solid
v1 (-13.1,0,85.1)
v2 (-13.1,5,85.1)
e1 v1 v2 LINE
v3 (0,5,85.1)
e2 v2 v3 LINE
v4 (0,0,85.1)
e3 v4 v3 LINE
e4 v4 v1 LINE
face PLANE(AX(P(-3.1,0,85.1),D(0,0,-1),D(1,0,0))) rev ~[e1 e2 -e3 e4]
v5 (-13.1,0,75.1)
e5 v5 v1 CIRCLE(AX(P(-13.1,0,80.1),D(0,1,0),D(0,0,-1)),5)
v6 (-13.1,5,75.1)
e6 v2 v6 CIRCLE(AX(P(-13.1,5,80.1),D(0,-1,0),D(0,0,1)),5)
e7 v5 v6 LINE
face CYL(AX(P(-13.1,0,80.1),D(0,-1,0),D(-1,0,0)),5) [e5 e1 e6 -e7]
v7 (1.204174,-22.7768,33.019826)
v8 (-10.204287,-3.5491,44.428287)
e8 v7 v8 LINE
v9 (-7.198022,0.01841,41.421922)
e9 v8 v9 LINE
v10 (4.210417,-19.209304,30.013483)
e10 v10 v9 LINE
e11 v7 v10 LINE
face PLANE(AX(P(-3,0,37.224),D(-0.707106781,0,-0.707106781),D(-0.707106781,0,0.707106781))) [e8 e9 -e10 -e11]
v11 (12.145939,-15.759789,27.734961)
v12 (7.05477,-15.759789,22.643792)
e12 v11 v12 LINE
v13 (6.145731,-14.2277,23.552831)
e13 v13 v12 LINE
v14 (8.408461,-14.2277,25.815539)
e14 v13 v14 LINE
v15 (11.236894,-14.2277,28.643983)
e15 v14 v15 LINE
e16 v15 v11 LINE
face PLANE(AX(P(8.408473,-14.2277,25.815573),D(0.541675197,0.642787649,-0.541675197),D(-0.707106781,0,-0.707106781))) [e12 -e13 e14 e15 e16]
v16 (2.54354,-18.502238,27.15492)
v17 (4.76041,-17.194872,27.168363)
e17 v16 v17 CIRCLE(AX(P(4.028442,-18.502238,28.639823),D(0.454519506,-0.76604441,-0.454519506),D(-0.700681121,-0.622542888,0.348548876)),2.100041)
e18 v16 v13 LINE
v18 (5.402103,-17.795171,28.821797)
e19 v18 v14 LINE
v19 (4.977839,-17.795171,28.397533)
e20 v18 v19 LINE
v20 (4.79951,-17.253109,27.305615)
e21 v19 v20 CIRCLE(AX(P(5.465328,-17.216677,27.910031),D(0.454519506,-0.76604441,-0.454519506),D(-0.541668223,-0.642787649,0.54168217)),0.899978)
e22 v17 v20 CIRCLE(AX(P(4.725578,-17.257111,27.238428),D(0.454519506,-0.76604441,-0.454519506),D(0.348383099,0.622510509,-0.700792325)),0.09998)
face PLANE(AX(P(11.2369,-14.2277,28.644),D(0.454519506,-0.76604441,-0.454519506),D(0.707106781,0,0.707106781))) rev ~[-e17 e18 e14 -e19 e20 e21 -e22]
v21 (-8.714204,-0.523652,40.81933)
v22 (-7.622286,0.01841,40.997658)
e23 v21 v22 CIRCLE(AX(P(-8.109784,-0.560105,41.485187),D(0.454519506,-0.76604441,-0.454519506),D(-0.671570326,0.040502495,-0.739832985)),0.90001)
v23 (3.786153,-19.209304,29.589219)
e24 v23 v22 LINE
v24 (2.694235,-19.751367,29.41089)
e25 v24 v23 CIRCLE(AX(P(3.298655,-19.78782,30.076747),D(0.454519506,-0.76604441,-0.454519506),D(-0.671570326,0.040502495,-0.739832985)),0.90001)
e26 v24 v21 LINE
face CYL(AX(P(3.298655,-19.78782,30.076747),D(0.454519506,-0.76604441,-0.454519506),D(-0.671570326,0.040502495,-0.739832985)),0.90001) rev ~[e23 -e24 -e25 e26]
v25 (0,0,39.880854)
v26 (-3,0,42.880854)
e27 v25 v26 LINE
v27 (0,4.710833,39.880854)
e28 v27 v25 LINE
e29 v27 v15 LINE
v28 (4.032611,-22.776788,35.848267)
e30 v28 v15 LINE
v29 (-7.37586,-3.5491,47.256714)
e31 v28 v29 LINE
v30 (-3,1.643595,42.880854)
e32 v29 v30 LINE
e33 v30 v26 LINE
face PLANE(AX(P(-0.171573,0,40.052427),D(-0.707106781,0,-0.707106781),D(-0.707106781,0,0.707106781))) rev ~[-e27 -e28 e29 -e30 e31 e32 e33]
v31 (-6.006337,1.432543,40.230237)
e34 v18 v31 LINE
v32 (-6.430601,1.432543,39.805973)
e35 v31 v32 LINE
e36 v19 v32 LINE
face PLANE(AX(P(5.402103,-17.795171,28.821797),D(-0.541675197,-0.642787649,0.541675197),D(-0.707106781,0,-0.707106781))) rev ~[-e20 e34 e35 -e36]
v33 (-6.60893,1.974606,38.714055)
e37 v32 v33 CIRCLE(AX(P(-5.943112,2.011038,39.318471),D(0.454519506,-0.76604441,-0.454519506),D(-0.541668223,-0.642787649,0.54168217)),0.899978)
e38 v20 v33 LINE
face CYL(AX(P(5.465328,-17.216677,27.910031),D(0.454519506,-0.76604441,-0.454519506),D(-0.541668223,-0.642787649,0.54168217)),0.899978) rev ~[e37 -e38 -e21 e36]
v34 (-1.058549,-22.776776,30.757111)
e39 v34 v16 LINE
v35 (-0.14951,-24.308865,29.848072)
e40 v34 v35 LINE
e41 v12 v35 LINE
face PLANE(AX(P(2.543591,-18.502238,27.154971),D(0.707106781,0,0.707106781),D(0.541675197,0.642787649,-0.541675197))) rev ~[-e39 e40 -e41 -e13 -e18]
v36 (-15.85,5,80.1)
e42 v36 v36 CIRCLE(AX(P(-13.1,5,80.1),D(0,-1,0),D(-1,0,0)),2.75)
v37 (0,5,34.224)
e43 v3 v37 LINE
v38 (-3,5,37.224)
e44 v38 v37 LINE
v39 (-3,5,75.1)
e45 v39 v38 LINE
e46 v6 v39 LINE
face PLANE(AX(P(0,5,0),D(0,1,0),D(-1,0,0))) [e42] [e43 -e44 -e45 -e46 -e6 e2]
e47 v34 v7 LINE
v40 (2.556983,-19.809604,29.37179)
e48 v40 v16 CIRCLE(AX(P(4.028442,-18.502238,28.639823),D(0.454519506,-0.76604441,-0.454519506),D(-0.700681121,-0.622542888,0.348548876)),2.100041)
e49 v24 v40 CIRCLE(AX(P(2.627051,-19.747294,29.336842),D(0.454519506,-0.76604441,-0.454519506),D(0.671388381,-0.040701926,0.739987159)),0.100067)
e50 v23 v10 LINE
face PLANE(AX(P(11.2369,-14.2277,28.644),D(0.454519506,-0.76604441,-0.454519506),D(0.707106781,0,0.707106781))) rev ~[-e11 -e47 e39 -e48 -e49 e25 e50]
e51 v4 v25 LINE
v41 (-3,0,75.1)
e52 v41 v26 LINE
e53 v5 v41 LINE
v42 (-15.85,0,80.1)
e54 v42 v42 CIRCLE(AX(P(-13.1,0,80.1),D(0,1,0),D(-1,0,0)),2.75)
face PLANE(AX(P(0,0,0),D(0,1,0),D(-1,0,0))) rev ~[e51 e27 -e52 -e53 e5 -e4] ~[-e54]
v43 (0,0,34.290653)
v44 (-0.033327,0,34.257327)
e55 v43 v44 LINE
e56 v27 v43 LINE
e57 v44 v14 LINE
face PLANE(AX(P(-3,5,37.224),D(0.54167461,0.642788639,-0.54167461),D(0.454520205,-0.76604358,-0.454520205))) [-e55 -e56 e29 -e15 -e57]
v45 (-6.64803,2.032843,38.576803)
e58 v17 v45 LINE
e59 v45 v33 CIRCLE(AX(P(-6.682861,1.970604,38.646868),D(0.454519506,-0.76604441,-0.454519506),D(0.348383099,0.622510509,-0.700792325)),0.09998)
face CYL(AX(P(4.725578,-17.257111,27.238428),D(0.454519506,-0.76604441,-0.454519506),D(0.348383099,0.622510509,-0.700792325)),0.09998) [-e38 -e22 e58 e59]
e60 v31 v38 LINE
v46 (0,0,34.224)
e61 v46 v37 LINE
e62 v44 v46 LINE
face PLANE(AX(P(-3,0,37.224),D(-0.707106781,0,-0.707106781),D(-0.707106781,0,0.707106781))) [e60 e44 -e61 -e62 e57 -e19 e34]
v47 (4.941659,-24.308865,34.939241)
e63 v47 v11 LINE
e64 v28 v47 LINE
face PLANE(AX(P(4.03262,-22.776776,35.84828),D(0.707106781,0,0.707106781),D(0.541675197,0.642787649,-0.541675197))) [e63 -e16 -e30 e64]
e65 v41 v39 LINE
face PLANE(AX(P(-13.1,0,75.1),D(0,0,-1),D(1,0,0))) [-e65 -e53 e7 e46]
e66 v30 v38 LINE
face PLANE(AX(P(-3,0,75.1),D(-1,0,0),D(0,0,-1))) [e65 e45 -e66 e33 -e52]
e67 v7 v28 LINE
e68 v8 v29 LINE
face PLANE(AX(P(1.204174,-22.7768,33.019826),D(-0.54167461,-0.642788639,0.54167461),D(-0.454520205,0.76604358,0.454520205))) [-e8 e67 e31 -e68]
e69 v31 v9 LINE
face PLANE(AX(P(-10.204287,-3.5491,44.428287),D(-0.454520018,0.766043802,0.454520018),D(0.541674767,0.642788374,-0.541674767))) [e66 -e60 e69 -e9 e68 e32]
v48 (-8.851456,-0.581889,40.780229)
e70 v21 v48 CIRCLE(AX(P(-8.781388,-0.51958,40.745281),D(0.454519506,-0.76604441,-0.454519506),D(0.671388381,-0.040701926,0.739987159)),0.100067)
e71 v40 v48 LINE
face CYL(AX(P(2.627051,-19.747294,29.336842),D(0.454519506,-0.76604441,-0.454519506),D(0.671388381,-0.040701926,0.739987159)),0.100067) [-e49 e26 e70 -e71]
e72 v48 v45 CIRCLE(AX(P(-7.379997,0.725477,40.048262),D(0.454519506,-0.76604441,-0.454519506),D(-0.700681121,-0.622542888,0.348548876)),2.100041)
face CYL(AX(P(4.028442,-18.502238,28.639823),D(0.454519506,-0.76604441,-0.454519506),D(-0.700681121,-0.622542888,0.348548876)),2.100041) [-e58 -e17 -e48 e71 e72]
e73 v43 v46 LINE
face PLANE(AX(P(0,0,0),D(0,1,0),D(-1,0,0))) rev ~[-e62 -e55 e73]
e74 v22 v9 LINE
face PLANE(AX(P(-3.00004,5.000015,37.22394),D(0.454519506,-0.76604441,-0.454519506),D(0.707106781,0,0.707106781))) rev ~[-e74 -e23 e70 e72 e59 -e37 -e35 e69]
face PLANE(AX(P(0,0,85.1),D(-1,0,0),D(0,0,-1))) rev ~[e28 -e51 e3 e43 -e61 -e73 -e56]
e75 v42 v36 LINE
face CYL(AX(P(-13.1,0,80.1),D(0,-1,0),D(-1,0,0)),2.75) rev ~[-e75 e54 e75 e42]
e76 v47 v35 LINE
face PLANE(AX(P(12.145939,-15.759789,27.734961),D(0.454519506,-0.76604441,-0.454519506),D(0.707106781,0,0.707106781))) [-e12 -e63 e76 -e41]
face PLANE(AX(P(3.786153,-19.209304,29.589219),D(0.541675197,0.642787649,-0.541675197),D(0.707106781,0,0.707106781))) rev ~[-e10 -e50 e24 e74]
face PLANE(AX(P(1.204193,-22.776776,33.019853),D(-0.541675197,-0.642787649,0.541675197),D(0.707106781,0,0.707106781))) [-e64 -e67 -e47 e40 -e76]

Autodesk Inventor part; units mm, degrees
ref_plane "YZ Plane" through (0, 0, 0) normal (1, 0, 0) x (0, 1, 0)
ref_plane "XZ Plane" through (0, 0, 0) normal (0, 1, 0) x (-1, 0, 0)
ref_plane "XY Plane" through (0, 0, 0) normal (0, 0, 1) x (1, 0, 0)
sketch "Sketch2" plane through (0, 0, 0) normal (0, 1, 0) x (-1, 0, 0)
  circle A0 centre (13.1, 80.1) radius 2.75
  circle A1 centre (80.1, 13.1) radius 2.75 construction
  line L0 (13.1, 80.1) -> (13.1, 13.1)
  line L1 (13.1, 13.1) -> (80.1, 13.1)
  line L2 (3, 37.224) -> (37.224, 3)
  line L3 (3, 37.224) -> (51.4, 37.224) construction
  circle A2 centre (80.1, 13.1) radius 2.75
  line L4 (3.1, 112.1) -> (3.1, 79.1)
  line L5 (79.1, 3.1) -> (112.1, 3.1)
  circle A3 centre (13.1, 80.1) radius 5
  line L6 (13.1, 75.1) -> (3, 75.1)
  line L7 (3, 75.1) -> (3, 3)
  line L8 (13.1, 85.1) -> (0, 85.1)
  line L9 (0, 85.1) -> (0, 0)
  circle A4 centre (80.1, 13.1) radius 5
  line L10 (85.1, 13.1) -> (85.1, 0)
  line L11 (75.1, 13.1) -> (75.1, 3)
  line L12 (75.1, 3) -> (3, 3)
  line L13 (85.1, 0) -> (0, 0)
  line L14 (3, 37.224) -> (-4.0711, 30.1529)
  line L15 (3, 37.224) -> (13, 37.224) construction
  point P0 (0, 0)
  point P1 (0, 34.224)
  dimension "d11" = 48.4
  dimension "d12" = 45
  dimension "d13" = 10
  dimension "d14" = 10.1
  dimension "d15" = 13.1
  dimension "d16" = 3
  dimension "d17" = 10
  dimension "d18" = 13.1
  dimension "d19" = 10.1
  dimension "d20" = 10
  dimension "d21" = 135
extrude "Extrusion2" add sketch "Sketch2" along normal blind 5 contours L6 L7 L14 L9 L8 A3 | A3
sketch "Sketch4" plane through (-3, 0, 37.224) normal (-0.7071068, 0, -0.7071068) x (-0.7071068, 0, 0.7071068)
  line L0 (0, 0) -> (0, 5) projected
  line L1 (0, 5) -> (-16.134, -14.2277)
  line L2 (0, 5) -> (25.1, 5) construction
  line L3 (-5.9456, -22.7768) -> (10.1884, -3.5491)
  line L4 (10.1884, -3.5491) -> (0, 5)
  line L5 (-5.9456, -22.7768) -> (-16.134, -14.2277)
  point P0 (-28.4426, 0)
  dimension "d33" = 130
  dimension "d34" = 25.1
  dimension "d35" = 13.3
  dimension "d37" = 25.1
extrude "Extrusion3" add sketch "Sketch4" against normal blind 4
sketch "Sketch6" plane through (0, -0.0562, 34.224) normal (-0.7071068, 0, -0.7071068) x (-0.7071068, 0, 0.7071068)
  line L0 (0, 5.0562) -> (4.2426, 5.0562) projected
  line L1 (0, 0.0562) -> (0, 5.0562) projected
  line L2 (0.0471, 0.0562) -> (-11.8913, -14.1715) projected
  line L3 (-11.8913, -14.1715) -> (-1.7029, -22.7206) projected
  line L4 (-1.7029, -22.7206) -> (14.431, -3.4929) projected
  line L5 (14.431, -3.4929) -> (4.2426, 5.0562) projected
  circle A0 centre (6.1229, -3.0486) radius 2.6
  line L6 (4.6432, 4.72) -> (14.755, -3.7647)
  circle A1 centre (-1.5906, -12.2411) radius 2.6
  line L7 (0, 0.0562) -> (0.0471, 0.0562) projected
  line L8 (14.431, -3.4929) -> (4.2426, 5.0562) projected
  line L9 (-6.7971, -18.4461) -> (10.7436, 2.4582)
  point P0 (-24.2, 0.0562)
  dimension "d38" = 5.2
  dimension "d39" = 5
  dimension "d40" = 12
extrude "Extrusion5" [suppressed]
fillet "Fillet1" [suppressed]
sketch "Sketch9" plane through (-0.1716, 0, 40.0524) normal (0.7071068, 0, 0.7071068) x (0.7071068, 0, -0.7071068)
  line L0 (4.1955, 0) -> (16.134, -14.2277) projected
  line L1 (16.134, -14.2277) -> (6.4922, -2.737)
  line L2 (6.4922, -2.737) -> (8.7903, -0.8087)
  line L3 (8.7903, -0.8087) -> (18.4321, -12.2994)
  line L4 (18.4321, -12.2994) -> (16.134, -14.2277)
  line L5 (5.9456, -22.7768) -> (16.134, -14.2277) projected
  line L6 (11.0398, -18.5023) -> (9.8066, -17.0326)
  line L7 (5.9456, -22.7768) -> (-3.6962, -11.2861)
  line L8 (-5.9944, -13.2145) -> (3.6474, -24.7052)
  line L9 (-3.6962, -11.2861) -> (-5.9944, -13.2145)
  line L10 (3.6474, -24.7052) -> (5.9456, -22.7768)
  point P0 (28.4426, 0)
  point P1 (4.6202, -0.5061)
  dimension "d46" = 15
  dimension "d47" = 3
extrude "Extrusion6" [suppressed]
sketch "Sketch10" plane through (8.4084, -14.2277, 25.8155) normal (0.4545195, -0.7660444, -0.4545195) x (0.7071068, 0, 0.7071068)
  line L0 (0, 0) -> (0, 13.3) projected
  line L1 (0, 0) -> (4, 0) projected
  line L2 (4, 13.3) -> (4, 0) projected
  line L3 (0, 13.3) -> (4, 13.3) projected
  line L4 (-0.6, 8.15) -> (0, 8.15)
  line L5 (0, -1.85) -> (0, 5.15)
  line L6 (0, 5.15) -> (-0.6, 5.15)
  arc A0 (-0.6, 5.15) -> (-1.099, 4.6815) centre (-0.6, 4.65) ccw
  arc A1 (-1.7225, 4.2287) -> (-1.099, 4.6815) centre (-1.598, 4.713) ccw
  arc A2 (-1.7225, 9.0713) -> (-1.7225, 4.2287) centre (-1.1, 6.65) ccw
  arc A3 (-1.099, 8.6185) -> (-1.7225, 9.0713) centre (-1.598, 8.587) ccw
  arc A4 (-1.099, 8.6185) -> (-0.6, 8.15) centre (-0.6, 8.65) ccw
  line L7 (0, 0) -> (0, 13.3) projected
  line L8 (0.6, 5.35) -> (-0.6, 5.35)
  arc A5 (-0.6, 5.35) -> (-1.2986, 4.6941) centre (-0.6, 4.65) ccw
  arc A6 (-1.6727, 4.4224) -> (-1.2986, 4.6941) centre (-1.598, 4.713) ccw
  arc A7 (-1.6727, 8.8776) -> (-1.6727, 4.4224) centre (-1.1, 6.65) ccw
  arc A8 (-1.2986, 8.6059) -> (-1.6727, 8.8776) centre (-1.598, 8.587) ccw
  arc A9 (-1.2986, 8.6059) -> (-0.6, 7.95) centre (-0.6, 8.65) ccw
  line L9 (-0.6, 7.95) -> (0.6, 7.95)
  line L10 (0.3, -1.85) -> (0.3, 5.45)
  line L11 (0.3, 5.45) -> (-0.6, 5.45)
  arc A10 (-0.6, 5.45) -> (-1.3984, 4.7004) centre (-0.6, 4.65) ccw
  arc A11 (-1.6478, 4.5193) -> (-1.3984, 4.7004) centre (-1.598, 4.713) ccw
  arc A12 (-1.6478, 8.7807) -> (-1.6478, 4.5193) centre (-1.1, 6.65) ccw
  arc A13 (-1.3984, 8.5996) -> (-1.6478, 8.7807) centre (-1.598, 8.587) ccw
  arc A14 (-1.3984, 8.5996) -> (-0.6, 7.85) centre (-0.6, 8.65) ccw
  line L12 (-0.6, 7.85) -> (0.4, 7.85)
  line L13 (0.4, -1.85) -> (0.4, 5.55)
  line L14 (0.4, 5.55) -> (-0.6, 5.55)
  arc A15 (-0.6, 5.55) -> (-1.4982, 4.7067) centre (-0.6, 4.65) ccw
  arc A16 (-1.6229, 4.6161) -> (-1.4982, 4.7067) centre (-1.598, 4.713) ccw
  arc A17 (-1.6229, 8.6839) -> (-1.6229, 4.6161) centre (-1.1, 6.65) ccw
  arc A18 (-1.4982, 8.5933) -> (-1.6229, 8.6839) centre (-1.598, 8.587) ccw
  arc A19 (-1.4982, 8.5933) -> (-0.6, 7.75) centre (-0.6, 8.65) ccw
  line L15 (-0.6, 7.75) -> (0.4, 7.75)
  point P0 (-24.2, -18.5744)
  point P1 (-11.4165, -11.1867)
  point P2 (0, 6.65)
  point P3 (0, 6.65)
  point P4 (0, 5.35)
  point P5 (0, 7.95)
  point P6 (0, 5.45)
  point P7 (0, 7.85)
  point P8 (0, 5.55)
  point P9 (0, 7.75)
  dimension "d64" = 2.5
  dimension "d65" = 0.6
  dimension "d66" = 1.1
  dimension "d67" = 0.2
  dimension "d68" = 0.3
  dimension "d69" = 0.4
extrude "Extrusion7" add sketch "Sketch10" against normal up to surface (25.1 mm away) contours L14 A15 A16 A17 A18 A19 L15 L0
sketch "Sketch11" plane through (11.2369, -14.2277, 28.644) normal (0.4545195, -0.7660444, -0.4545195) x (0.7071068, 0, 0.7071068)
  line L0 (-4, 0) -> (-4, 5.55) projected
  line L1 (-4, 0) -> (0, 0) projected
  line L2 (0, 13.3) -> (0, 0) projected
  line L3 (-4, 13.3) -> (0, 13.3) projected
  line L4 (0, 0) -> (0, 13.3)
  line L5 (0, 0) -> (-7.3, 0)
  line L6 (-7.7, 13.3) -> (0, 13.3)
  line L7 (0, 13.3) -> (0, 0)
  line L8 (-4, 7.75) -> (-4, 13.3) projected
  line L9 (-4, 7.75) -> (-4.6, 7.75) projected
  arc A0 (-5.4982, 8.5933) -> (-4.6, 7.75) centre (-4.6, 8.65) ccw projected
  arc A1 (-5.4982, 8.5933) -> (-5.6229, 8.6839) centre (-5.598, 8.587) ccw projected
  arc A2 (-5.6229, 8.6839) -> (-5.6229, 4.6161) centre (-5.1, 6.65) ccw projected
  arc A3 (-5.6229, 4.6161) -> (-5.4982, 4.7067) centre (-5.598, 4.713) ccw projected
  arc A4 (-4.6, 5.55) -> (-5.4982, 4.7067) centre (-4.6, 4.65) ccw projected
  line L10 (-4.6, 5.55) -> (-4, 5.55) projected
  line L11 (-7.2, 13.3) -> (-7.2, 0)
  arc A5 (-5.6229, 8.6839) -> (-5.6229, 4.6161) centre (-5.1, 6.65) ccw projected
  point P0 (-28.2, -18.5744)
  point P1 (-4, 0)
  point P2 (0, 13.3)
  point P3 (0, 0)
  point P4 (-4, 13.3)
  point P5 (-4, 13.3)
  point P6 (-4, 0)
  point P7 (-7.2, 6.65)
  point P8 (-7.2, 6.65)
extrude "Extrusion8" add sketch "Sketch11" along normal blind 2
properties part number "Pixy2 mount"
